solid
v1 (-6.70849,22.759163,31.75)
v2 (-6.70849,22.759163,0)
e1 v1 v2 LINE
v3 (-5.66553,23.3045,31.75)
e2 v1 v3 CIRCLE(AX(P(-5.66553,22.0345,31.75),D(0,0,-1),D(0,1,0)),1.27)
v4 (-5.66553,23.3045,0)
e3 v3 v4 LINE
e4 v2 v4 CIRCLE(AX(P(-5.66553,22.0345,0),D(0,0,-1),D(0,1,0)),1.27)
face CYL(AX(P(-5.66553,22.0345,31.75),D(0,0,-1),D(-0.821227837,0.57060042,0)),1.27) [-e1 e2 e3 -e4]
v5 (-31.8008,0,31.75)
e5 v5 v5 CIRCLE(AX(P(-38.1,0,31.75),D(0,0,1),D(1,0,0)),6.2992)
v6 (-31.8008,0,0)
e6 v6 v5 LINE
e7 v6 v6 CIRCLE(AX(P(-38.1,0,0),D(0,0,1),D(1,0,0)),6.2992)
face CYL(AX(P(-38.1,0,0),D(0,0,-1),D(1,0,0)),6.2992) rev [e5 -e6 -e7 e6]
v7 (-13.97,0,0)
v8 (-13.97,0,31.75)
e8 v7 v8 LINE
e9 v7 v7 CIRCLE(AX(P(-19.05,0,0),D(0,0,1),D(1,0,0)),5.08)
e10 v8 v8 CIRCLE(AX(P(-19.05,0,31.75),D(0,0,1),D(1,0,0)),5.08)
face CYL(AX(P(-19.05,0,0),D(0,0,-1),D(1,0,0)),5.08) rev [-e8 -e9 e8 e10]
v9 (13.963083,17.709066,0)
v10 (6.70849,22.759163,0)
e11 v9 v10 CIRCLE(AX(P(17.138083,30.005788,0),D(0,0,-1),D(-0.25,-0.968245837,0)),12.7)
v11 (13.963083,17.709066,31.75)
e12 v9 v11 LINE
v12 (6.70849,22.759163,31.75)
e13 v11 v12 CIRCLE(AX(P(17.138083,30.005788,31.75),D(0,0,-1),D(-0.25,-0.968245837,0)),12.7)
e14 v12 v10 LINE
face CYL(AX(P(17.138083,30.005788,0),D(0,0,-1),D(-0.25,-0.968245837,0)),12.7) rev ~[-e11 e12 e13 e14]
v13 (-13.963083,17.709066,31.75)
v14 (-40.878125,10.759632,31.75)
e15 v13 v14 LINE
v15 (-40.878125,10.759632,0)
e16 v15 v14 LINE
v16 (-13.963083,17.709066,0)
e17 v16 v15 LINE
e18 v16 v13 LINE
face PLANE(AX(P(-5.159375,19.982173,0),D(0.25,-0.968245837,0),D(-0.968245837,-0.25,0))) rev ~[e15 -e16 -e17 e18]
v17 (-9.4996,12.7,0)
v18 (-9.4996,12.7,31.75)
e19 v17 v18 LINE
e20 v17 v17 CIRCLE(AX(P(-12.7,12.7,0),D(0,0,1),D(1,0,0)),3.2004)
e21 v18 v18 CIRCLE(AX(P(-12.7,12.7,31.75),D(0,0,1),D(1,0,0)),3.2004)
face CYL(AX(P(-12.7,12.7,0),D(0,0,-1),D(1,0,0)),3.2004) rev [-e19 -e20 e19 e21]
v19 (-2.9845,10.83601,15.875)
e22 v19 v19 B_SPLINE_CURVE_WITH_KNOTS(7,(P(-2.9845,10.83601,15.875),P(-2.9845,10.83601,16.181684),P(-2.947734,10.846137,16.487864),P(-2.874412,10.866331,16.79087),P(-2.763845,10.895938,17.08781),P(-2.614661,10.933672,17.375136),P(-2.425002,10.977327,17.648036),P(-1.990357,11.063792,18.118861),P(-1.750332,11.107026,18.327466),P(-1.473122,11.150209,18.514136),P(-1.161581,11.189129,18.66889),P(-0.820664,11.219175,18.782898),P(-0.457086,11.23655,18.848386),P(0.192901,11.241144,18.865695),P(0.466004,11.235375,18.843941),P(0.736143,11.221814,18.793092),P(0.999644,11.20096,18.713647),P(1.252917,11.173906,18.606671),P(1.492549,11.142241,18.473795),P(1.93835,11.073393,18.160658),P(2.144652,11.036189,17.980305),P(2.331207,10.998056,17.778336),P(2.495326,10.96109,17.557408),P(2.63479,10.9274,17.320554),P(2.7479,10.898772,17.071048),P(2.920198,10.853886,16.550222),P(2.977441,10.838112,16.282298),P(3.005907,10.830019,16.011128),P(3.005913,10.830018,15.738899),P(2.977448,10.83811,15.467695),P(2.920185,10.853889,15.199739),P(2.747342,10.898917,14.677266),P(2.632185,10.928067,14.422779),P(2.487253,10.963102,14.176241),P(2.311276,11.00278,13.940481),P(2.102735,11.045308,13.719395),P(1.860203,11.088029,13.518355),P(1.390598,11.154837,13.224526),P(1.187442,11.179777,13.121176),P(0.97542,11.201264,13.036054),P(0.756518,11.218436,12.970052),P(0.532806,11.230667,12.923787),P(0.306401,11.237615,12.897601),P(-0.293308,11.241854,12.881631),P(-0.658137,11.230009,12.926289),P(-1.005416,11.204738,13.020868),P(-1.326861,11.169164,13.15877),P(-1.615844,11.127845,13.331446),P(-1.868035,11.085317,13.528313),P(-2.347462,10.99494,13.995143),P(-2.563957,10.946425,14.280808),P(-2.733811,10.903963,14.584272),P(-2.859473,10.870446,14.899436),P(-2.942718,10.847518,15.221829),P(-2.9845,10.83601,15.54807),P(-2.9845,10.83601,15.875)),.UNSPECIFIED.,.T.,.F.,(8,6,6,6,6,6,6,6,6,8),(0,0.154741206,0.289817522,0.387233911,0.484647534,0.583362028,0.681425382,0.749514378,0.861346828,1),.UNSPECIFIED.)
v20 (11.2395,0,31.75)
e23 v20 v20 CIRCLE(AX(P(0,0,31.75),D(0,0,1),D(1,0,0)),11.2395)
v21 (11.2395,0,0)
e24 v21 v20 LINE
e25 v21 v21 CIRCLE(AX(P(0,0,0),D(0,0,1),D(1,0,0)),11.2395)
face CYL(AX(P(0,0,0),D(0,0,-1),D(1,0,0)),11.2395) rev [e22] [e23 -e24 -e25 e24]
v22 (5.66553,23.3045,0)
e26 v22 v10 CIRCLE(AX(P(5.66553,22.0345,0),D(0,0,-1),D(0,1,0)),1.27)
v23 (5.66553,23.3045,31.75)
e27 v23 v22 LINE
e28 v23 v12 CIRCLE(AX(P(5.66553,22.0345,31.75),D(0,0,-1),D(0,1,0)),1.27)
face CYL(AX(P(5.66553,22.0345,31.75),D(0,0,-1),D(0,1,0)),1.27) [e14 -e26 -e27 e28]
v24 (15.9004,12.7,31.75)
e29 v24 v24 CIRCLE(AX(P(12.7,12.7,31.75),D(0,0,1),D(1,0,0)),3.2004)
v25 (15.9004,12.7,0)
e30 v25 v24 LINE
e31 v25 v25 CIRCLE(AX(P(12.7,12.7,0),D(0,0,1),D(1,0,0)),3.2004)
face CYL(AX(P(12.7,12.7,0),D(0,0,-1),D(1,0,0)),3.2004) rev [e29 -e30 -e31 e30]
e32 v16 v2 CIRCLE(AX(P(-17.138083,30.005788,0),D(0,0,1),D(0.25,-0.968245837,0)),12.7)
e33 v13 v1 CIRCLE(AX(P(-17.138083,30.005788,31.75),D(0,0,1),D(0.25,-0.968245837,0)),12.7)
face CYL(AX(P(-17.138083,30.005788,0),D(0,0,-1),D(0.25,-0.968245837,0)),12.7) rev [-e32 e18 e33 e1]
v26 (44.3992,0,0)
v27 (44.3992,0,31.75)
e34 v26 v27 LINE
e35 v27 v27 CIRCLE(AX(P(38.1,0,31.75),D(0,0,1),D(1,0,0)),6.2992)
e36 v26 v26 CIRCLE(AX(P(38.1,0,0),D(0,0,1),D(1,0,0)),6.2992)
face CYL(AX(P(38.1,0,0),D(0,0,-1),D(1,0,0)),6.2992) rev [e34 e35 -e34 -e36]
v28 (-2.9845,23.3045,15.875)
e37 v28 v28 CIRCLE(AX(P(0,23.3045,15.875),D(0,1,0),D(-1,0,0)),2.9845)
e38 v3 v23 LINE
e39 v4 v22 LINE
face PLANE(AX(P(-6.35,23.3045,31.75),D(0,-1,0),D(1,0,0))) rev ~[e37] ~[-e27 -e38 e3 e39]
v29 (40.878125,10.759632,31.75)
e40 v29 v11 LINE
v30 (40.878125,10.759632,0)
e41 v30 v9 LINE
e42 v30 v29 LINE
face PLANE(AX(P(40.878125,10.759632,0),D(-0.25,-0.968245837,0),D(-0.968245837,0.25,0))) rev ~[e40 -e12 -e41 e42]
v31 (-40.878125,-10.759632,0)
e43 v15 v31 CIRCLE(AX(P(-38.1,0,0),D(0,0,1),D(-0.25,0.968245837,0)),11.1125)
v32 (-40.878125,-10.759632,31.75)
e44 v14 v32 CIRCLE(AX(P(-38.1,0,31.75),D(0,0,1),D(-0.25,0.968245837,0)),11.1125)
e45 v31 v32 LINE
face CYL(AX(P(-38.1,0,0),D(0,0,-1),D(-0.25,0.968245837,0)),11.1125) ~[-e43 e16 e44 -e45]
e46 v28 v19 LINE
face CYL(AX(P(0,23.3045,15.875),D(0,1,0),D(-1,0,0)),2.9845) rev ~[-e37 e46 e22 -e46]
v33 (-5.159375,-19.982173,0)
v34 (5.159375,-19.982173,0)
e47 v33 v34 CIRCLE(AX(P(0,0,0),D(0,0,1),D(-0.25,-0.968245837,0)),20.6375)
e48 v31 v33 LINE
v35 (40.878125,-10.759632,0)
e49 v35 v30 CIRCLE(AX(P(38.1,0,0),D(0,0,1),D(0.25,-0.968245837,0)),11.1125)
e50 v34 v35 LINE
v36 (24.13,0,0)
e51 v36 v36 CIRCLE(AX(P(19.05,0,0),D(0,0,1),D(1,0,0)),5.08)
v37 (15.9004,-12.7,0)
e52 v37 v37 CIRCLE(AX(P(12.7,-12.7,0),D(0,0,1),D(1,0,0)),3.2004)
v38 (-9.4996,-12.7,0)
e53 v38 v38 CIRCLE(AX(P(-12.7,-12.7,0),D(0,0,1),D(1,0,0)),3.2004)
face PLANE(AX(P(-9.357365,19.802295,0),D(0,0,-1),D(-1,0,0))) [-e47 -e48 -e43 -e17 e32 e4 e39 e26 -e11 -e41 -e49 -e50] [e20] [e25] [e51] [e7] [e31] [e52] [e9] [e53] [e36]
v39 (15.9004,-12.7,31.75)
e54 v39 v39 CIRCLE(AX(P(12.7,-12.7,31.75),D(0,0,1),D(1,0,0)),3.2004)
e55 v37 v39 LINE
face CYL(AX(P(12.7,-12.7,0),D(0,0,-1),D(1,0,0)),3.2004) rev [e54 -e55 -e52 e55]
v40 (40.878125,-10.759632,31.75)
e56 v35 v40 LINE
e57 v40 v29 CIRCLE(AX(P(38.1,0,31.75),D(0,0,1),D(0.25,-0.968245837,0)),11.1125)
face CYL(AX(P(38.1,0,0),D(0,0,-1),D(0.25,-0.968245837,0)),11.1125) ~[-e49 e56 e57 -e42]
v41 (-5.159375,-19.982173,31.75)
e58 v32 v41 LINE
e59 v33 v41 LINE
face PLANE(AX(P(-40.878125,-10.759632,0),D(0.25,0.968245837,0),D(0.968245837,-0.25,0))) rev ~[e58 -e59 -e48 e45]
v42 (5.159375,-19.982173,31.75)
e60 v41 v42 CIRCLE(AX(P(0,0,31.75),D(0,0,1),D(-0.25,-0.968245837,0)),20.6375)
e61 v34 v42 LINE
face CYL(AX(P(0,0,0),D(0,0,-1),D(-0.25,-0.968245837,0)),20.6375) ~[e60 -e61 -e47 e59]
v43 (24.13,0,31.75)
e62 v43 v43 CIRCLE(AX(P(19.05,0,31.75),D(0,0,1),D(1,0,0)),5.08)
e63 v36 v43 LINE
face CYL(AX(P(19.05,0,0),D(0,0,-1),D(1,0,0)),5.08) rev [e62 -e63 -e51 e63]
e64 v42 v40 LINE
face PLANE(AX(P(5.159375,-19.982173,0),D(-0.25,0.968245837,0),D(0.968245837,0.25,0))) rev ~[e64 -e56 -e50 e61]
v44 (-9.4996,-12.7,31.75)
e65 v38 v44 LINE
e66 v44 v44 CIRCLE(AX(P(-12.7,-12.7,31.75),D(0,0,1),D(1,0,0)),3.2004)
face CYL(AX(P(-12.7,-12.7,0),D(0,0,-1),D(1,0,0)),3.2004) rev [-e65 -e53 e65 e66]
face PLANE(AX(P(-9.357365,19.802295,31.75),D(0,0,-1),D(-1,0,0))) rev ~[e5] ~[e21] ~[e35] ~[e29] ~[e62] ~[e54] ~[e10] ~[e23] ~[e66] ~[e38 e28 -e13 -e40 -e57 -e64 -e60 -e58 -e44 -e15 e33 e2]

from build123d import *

# Parameters (mm, degrees)
F0_R        = 3.2004
F0_R_2      = 6.2992
F0_R_3      = 5.08
F0_R_4      = 11.2395
F1_DEPTH    = 31.75
F2_W        = 12.7
F2_H        = 5.1071889116
F3_DEPTH    = 31.75
F4_T1_DEPTH = 31.75
F5_R        = 1.27
F6_R        = 2.9845
F7_DEPTH    = 25.4


# Not quite as in the source:
# - a fillet or chamfer that OpenCascade refuses, or shapes differently, is made with other operations: its cross-section is extruded or revolved along the edge and cut away or added


with BuildPart() as f1:
    # F0 (on Top) → F1 (new body)
    with BuildSketch(Plane.XY):
        with BuildLine():
            Line((-5.159375, 19.9821734518), (-40.878125, 10.7596318587))
            ThreePointArc((-40.878125, 10.7596318587), (-49.2125, 0), (-40.878125, -10.7596318587))
            Line((-40.878125, -10.7596318587), (-5.159375, -19.9821734518))
            ThreePointArc((-5.159375, -19.9821734518), (0, -20.6375), (5.159375, -19.9821734518))
            Line((5.159375, -19.9821734518), (40.878125, -10.7596318587))
            ThreePointArc((40.878125, -10.7596318587), (49.2125, 0), (40.878125, 10.7596318587))
            Line((40.878125, 10.7596318587), (5.159375, 19.9821734518))
            ThreePointArc((5.159375, 19.9821734518), (0, 20.6375), (-5.159375, 19.9821734518))
        make_face()
        with Locations((-12.7, -12.7)):
            Circle(F0_R, mode=Mode.SUBTRACT)
        with Locations((12.7, -12.7)):
            Circle(F0_R, mode=Mode.SUBTRACT)
        with Locations((-38.1, 0)):
            Circle(F0_R_2, mode=Mode.SUBTRACT)
        with Locations((-19.05, 0)):
            Circle(F0_R_3, mode=Mode.SUBTRACT)
        with Locations((-12.7, 12.7)):
            Circle(F0_R, mode=Mode.SUBTRACT)
        Circle(F0_R_4, mode=Mode.SUBTRACT)
        with Locations((19.05, 0)):
            Circle(F0_R_3, mode=Mode.SUBTRACT)
        with Locations((38.1, 0)):
            Circle(F0_R_2, mode=Mode.SUBTRACT)
        with Locations((12.7, 12.7)):
            Circle(F0_R, mode=Mode.SUBTRACT)
    extrude(amount=F1_DEPTH)

    # F2 (on face) → F3 (join)
    with BuildSketch(Plane.XY.offset(31.75)):
        with Locations((0, 20.7509055442)):
            Rectangle(F2_W, F2_H)
    extrude(amount=-F3_DEPTH)

    # F4: fillet of radius 12.7 on 2 edges, made by hand

    # F4_s2 → F4_t1 (join)
    with BuildSketch(Plane.XY):
        with BuildLine():
            ThreePointArc((-13.9630832797, 17.7090657484), (-9.6168370541, 19.7724670423), (-6.35, 23.3045))
            Line((-6.35, 23.3045), (-6.35, 19.6747553987))
            Line((-6.35, 19.6747553987), (-13.9630832797, 17.7090657484))
        make_face()
        with BuildLine():
            ThreePointArc((13.9630832797, 17.7090657484), (9.6168370541, 19.7724670423), (6.35, 23.3045))
            Line((6.35, 23.3045), (6.35, 19.6747553987))
            Line((6.35, 19.6747553987), (13.9630832797, 17.7090657484))
        make_face()
    extrude(amount=F4_T1_DEPTH)

    # F5
    f5_edges = [f1.edges().sort_by_distance(p)[0] for p in [
        (-6.35, 23.3045, 15.875),
        (6.35, 23.3045, 15.875),
    ]]
    fillet(f5_edges, radius=F5_R)

    # F6 (on face) → F7 (cut)
    with BuildSketch(Plane(origin=(0, 23.3045, 0), x_dir=(-1, 0, 0), z_dir=(0, 1, 0))):
        with Locations((0, 15.875)):
            Circle(F6_R)
    extrude(amount=-F7_DEPTH, mode=Mode.SUBTRACT)


solid = f1.part
